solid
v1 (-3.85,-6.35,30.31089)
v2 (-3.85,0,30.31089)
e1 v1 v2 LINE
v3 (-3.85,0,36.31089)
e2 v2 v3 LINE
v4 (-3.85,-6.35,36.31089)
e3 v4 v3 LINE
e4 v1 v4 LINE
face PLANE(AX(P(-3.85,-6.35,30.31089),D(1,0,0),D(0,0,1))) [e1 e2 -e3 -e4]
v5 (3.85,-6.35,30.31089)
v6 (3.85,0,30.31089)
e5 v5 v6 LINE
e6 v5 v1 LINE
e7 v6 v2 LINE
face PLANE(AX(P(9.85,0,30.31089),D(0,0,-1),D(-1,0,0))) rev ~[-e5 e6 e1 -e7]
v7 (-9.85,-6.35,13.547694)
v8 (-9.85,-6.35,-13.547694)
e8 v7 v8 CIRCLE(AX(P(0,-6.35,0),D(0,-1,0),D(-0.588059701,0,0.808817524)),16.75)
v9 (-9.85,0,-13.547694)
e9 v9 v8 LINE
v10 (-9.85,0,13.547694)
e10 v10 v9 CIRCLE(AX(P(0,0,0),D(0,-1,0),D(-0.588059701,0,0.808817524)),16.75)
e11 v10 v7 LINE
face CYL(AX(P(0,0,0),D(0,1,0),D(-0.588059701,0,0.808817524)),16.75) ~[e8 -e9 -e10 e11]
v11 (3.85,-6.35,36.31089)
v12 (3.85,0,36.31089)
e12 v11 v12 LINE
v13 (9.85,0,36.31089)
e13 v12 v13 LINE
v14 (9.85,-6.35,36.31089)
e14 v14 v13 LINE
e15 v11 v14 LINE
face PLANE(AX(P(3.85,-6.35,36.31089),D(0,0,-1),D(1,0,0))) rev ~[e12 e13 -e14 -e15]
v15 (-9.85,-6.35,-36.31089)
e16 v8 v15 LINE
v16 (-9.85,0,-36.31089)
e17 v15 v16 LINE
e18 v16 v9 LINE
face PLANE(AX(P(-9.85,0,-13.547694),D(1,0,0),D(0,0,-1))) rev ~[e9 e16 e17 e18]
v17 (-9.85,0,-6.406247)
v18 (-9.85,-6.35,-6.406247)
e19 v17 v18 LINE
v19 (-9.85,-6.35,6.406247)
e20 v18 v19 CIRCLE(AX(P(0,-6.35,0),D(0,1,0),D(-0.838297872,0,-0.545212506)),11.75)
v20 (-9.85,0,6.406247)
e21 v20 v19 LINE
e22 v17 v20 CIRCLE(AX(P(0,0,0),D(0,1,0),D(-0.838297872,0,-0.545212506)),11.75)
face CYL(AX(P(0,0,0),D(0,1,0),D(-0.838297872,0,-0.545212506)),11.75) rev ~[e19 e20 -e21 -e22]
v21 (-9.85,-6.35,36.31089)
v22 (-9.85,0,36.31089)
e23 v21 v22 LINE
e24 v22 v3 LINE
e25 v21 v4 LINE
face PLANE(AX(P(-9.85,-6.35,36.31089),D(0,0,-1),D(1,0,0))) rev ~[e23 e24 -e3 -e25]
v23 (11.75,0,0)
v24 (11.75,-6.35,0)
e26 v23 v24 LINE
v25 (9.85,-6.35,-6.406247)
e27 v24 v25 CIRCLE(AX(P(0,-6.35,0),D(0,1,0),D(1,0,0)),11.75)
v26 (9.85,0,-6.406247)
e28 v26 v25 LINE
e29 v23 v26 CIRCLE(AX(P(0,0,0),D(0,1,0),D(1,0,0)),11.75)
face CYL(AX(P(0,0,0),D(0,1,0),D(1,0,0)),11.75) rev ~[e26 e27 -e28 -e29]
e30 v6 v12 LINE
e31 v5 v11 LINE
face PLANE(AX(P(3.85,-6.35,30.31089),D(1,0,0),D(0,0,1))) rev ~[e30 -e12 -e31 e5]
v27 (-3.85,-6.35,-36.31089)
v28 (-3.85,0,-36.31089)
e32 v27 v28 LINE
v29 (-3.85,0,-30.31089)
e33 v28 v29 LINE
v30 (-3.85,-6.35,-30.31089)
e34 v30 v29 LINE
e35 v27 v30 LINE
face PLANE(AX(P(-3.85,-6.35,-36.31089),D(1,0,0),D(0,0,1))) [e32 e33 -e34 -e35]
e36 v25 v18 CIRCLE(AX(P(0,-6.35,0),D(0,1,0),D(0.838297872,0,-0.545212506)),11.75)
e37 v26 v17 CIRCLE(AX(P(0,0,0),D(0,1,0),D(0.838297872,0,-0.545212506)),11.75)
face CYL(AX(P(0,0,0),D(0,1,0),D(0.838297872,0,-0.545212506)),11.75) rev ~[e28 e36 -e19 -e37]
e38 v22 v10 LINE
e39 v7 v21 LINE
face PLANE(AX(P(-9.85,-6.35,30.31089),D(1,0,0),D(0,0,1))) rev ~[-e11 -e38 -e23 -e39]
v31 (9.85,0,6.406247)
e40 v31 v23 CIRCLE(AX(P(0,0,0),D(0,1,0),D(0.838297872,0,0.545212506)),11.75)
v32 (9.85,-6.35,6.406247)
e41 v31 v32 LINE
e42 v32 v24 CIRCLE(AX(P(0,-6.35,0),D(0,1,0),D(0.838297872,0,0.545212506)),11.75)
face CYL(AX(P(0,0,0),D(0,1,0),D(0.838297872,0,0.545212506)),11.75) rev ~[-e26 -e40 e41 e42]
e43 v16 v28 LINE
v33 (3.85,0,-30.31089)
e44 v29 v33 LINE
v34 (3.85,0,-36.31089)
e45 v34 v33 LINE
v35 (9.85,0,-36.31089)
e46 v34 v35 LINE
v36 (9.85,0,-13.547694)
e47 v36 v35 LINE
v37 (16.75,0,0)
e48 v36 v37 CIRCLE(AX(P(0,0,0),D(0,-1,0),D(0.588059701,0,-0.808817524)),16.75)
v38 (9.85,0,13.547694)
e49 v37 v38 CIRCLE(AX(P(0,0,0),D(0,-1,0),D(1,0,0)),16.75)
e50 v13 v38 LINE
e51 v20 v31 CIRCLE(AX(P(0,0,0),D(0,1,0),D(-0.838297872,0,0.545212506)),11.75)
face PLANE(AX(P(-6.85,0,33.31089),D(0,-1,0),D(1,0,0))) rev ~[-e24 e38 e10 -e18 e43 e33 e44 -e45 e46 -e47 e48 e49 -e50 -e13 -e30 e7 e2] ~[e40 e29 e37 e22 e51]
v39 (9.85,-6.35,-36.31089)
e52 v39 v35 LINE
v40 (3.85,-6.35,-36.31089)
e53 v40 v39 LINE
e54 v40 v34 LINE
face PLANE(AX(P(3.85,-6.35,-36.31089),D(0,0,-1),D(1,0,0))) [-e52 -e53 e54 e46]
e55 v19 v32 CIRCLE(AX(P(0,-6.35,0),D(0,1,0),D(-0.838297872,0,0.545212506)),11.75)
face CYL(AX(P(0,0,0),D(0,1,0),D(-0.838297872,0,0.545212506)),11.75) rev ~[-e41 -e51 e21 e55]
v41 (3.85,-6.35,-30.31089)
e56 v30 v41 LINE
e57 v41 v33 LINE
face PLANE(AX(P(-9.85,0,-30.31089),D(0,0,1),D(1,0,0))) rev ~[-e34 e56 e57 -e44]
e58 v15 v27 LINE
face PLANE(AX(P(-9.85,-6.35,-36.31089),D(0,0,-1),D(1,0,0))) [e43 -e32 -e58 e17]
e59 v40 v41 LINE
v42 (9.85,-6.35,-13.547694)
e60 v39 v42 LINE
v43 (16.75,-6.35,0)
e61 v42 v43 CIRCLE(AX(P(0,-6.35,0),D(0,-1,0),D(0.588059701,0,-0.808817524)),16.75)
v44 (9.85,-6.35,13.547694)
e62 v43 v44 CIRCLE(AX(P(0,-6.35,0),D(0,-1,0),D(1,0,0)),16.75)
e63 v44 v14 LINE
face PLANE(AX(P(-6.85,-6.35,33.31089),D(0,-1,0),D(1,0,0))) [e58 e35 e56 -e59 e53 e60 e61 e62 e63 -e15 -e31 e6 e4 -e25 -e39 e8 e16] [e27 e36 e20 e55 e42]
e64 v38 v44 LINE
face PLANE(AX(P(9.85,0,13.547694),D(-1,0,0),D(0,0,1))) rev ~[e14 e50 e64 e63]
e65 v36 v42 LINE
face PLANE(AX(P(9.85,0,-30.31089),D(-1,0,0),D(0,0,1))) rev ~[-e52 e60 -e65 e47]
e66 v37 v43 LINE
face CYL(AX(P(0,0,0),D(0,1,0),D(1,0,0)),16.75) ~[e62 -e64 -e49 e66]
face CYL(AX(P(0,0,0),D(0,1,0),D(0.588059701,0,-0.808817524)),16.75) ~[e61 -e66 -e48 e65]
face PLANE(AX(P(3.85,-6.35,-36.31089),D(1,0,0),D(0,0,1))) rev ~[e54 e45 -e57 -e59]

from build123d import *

# Parameters (mm, degrees)
F1_DEPTH = 6.35
F2_W     = 6
F2_H     = 6
F3_DEPTH = 6.35


# Not quite as in the source:
# - a length typed as a fraction of an inch, garbled in the dataset ("3 / 203.2 mm" for 3/8 in), is restored


with BuildPart() as f1:
    # F0 (on Front) → F1 (new body)
    with BuildSketch(Plane.XZ):
        with BuildLine():
            ThreePointArc((9.85, 6.4062469512), (11.2649900133, 3.3410327745), (11.75, 0))
            ThreePointArc((11.75, 0), (11.2649900133, -3.3410327745), (9.85, -6.4062469512))
            Line((9.85, -6.4062469512), (9.85, -13.5476935306))
            ThreePointArc((9.85, -13.5476935306), (14.9256490646, -7.6018089952), (16.75, 0))
            ThreePointArc((16.75, 0), (14.9256490646, 7.6018089952), (9.85, 13.5476935306))
            Line((9.85, 13.5476935306), (9.85, 6.4062469512))
        make_face()
        with BuildLine():
            ThreePointArc((-9.85, 6.4062469512), (0, 11.75), (9.85, 6.4062469512))
            Line((9.85, 6.4062469512), (9.85, 13.5476935306))
            ThreePointArc((9.85, 13.5476935306), (0, 16.75), (-9.85, 13.5476935306))
            Line((-9.85, 13.5476935306), (-9.85, 6.4062469512))
        make_face()
        with BuildLine():
            Line((9.85, -13.5476935306), (9.85, -6.4062469512))
            ThreePointArc((9.85, -6.4062469512), (0, -11.75), (-9.85, -6.4062469512))
            Line((-9.85, -6.4062469512), (-9.85, -13.5476935306))
            ThreePointArc((-9.85, -13.5476935306), (0, -16.75), (9.85, -13.5476935306))
        make_face()
        with BuildLine():
            ThreePointArc((-9.85, -6.4062469512), (-11.75, 0), (-9.85, 6.4062469512))
            Line((-9.85, 6.4062469512), (-9.85, 13.5476935306))
            ThreePointArc((-9.85, 13.5476935306), (-16.75, 0), (-9.85, -13.5476935306))
            Line((-9.85, -13.5476935306), (-9.85, -6.4062469512))
        make_face()
        with BuildLine():
            ThreePointArc((-9.85, 13.5476935306), (0, 16.75), (9.85, 13.5476935306))
            Line((9.85, 13.5476935306), (9.85, 30.31089))
            Line((9.85, 30.31089), (-9.85, 30.31089))
            Line((-9.85, 30.31089), (-9.85, 13.5476935306))
        make_face()
        with BuildLine():
            Line((9.85, -30.31089), (9.85, -13.5476935306))
            ThreePointArc((9.85, -13.5476935306), (0, -16.75), (-9.85, -13.5476935306))
            Line((-9.85, -13.5476935306), (-9.85, -30.31089))
            Line((-9.85, -30.31089), (9.85, -30.31089))
        make_face()
    extrude(amount=F1_DEPTH)

    # F2 (on face) → F3 (join)
    with BuildSketch(Plane.XZ.offset(6.35)):
        with Locations((-6.85, 33.31089)):
            Rectangle(F2_W, F2_H)
        with Locations((6.85, 33.31089)):
            Rectangle(F2_W, F2_H)
        with Locations((-6.85, -33.31089)):
            Rectangle(F2_W, F2_H)
        with Locations((6.85, -33.31089)):
            Rectangle(F2_W, F2_H)
    extrude(amount=-F3_DEPTH)


solid = f1.part
